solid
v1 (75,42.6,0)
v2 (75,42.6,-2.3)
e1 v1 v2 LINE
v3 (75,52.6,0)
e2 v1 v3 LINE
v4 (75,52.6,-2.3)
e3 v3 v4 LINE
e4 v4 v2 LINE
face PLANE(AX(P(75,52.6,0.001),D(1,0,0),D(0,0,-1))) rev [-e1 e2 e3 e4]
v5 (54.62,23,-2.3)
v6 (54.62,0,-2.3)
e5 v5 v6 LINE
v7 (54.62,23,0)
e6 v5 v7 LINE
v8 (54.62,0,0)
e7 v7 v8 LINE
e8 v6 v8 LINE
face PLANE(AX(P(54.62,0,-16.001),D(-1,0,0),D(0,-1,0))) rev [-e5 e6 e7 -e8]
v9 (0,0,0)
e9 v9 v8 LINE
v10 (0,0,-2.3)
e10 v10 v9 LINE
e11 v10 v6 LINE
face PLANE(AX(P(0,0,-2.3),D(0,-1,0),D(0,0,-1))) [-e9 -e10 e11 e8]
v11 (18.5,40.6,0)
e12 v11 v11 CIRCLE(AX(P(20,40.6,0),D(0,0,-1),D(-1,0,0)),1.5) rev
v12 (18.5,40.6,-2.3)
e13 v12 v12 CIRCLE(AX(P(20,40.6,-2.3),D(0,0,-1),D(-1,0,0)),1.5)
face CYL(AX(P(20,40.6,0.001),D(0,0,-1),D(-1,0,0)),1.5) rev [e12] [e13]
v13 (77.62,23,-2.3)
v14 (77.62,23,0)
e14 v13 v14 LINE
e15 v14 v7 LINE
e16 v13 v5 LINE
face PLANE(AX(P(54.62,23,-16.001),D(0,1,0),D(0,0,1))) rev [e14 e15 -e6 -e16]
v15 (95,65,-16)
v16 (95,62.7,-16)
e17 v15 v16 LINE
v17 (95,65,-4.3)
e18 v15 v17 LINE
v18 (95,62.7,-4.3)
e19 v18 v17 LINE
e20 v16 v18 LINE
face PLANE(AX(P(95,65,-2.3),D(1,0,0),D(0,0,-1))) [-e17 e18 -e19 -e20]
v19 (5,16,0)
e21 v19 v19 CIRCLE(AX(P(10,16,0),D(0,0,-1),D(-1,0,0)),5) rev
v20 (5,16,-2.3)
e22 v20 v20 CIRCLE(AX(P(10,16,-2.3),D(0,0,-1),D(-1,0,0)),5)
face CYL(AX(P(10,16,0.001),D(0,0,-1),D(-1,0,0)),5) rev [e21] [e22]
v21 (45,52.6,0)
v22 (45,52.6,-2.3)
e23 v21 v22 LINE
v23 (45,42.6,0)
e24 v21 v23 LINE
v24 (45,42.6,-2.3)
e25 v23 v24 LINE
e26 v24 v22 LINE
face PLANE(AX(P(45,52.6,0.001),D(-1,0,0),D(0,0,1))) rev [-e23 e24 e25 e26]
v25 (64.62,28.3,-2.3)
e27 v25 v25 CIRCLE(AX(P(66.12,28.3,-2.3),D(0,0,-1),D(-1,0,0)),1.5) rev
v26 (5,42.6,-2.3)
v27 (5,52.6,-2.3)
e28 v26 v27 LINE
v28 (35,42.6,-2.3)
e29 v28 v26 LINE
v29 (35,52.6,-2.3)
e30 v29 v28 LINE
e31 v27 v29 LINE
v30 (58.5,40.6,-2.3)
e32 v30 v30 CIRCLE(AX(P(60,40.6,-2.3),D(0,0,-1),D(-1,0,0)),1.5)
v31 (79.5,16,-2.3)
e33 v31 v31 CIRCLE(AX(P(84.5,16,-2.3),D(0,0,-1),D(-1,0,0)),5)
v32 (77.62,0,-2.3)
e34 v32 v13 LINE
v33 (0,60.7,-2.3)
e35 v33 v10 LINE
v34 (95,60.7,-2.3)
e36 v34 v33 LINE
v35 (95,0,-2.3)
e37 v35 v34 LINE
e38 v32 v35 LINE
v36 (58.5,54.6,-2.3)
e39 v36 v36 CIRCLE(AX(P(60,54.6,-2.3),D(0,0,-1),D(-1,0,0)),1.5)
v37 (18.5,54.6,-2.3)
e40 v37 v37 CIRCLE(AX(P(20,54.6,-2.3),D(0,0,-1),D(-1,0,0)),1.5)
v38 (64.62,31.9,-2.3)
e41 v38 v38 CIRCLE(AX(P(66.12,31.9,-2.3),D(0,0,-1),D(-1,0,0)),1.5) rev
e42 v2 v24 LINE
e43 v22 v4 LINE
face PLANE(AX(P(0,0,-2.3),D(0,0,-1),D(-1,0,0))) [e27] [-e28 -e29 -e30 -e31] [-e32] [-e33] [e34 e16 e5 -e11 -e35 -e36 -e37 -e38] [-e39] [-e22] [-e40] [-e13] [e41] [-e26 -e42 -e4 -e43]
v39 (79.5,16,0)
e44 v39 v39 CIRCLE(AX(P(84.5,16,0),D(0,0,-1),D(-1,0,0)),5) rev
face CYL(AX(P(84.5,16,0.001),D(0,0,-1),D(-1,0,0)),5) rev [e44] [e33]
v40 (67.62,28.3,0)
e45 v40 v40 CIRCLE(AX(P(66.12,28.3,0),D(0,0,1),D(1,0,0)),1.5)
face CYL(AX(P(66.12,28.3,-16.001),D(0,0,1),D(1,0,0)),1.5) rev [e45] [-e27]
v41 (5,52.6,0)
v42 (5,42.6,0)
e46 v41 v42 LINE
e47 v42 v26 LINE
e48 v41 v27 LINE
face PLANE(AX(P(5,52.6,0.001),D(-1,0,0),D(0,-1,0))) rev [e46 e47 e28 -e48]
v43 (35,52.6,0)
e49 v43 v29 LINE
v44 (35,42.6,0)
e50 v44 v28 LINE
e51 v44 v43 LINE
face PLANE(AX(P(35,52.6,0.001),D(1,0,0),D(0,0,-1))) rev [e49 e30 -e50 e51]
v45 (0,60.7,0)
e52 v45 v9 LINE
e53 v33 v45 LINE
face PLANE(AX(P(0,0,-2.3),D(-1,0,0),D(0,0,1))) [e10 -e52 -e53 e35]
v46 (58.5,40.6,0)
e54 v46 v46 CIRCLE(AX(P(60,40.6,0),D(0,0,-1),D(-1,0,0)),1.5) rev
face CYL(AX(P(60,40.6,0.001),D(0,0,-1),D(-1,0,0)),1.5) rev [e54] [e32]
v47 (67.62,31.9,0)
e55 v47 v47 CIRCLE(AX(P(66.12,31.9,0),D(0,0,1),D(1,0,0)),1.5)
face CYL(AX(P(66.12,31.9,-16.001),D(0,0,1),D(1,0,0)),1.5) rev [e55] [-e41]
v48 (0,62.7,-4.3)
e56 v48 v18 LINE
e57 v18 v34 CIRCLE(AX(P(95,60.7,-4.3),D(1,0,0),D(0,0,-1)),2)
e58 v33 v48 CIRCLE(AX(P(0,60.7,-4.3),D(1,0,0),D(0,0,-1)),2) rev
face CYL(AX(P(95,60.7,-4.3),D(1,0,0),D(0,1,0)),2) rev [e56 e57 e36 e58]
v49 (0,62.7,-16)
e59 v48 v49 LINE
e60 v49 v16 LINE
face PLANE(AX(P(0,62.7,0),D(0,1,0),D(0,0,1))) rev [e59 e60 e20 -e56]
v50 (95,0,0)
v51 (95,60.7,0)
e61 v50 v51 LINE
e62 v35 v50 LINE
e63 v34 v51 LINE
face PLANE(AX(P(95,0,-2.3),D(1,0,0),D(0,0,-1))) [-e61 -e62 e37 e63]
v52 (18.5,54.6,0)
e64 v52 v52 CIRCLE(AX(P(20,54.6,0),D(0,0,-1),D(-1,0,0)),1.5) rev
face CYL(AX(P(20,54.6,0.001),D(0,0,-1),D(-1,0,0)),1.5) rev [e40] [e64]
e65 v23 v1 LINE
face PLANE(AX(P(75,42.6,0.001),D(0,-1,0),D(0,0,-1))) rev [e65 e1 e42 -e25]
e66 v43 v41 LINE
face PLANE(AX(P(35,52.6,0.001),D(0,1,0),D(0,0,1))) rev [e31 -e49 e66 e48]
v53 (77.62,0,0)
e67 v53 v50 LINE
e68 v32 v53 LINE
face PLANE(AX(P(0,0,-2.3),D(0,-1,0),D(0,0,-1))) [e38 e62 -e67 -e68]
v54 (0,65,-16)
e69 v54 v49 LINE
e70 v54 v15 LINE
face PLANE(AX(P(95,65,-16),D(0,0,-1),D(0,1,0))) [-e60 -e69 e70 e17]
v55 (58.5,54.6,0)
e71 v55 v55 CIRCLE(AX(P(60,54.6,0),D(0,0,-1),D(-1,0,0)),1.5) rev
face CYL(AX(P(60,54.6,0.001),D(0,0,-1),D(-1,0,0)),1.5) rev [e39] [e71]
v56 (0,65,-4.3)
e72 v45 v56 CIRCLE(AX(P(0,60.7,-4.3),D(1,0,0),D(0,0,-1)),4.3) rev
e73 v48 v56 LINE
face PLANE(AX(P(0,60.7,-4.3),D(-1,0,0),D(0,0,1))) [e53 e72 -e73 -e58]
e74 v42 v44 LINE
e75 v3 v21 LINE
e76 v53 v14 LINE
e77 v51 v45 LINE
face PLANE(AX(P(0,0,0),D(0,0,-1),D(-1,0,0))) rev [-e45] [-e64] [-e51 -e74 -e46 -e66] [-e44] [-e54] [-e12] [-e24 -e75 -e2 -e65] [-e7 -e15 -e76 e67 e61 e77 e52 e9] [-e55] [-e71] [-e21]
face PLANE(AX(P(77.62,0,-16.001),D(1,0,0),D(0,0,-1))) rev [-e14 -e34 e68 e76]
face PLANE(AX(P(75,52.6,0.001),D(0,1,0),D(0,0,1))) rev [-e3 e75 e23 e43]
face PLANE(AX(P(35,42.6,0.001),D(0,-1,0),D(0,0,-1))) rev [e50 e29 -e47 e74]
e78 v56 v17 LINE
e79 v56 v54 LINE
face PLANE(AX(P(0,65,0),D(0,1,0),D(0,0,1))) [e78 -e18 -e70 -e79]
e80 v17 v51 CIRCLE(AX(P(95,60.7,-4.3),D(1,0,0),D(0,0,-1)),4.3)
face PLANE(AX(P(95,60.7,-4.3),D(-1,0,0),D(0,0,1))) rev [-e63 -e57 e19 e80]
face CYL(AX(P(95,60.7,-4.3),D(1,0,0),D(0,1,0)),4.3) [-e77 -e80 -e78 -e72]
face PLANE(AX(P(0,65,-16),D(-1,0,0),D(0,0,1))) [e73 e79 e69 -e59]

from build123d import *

# Parameters (mm, degrees)
SKETCH1_W                    = 95
SKETCH1_H                    = 65
BASE_FLANGE1_DEPTH           = 2.3
EDGE_FLANGE1_STRIP_W         = 13.2
EDGE_FLANGE1_STRIP_H         = 2.3
EDGE_FLANGE1_STRIP_CUT_DEPTH = 95
EDGE_FLANGE1_DEPTH           = 95
CUT_EXTRUDE1_REACH           = 118.215
SKETCH9_R                    = 1.5
SKETCH9_W                    = 23
SKETCH9_H                    = 23
CUT_EXTRUDE3_REACH           = 117.921
SKETCH10_R                   = 1.5
SKETCH10_W                   = 30
SKETCH10_H                   = 10
CUT_EXTRUDE4_REACH           = 117.921
SKETCH11_R                   = 5


# Sheet-metal steps are written as plain solids
with BuildPart() as part:
    # Sketch1 → Base-Flange1 (new body)
    with BuildSketch(Plane.XY):
        with Locations((47.5, 32.5)):
            Rectangle(SKETCH1_W, SKETCH1_H)
    extrude(amount=-BASE_FLANGE1_DEPTH)

    # Edge-Flange1 strip (across the edge) → Edge-Flange1 strip cut (cut)
    with BuildSketch(Plane(origin=(0, 65, -2.3), x_dir=(0, -1, 0), z_dir=(1, 0, 0))):
        with Locations((-2.3, -1.15)):
            Rectangle(EDGE_FLANGE1_STRIP_W, EDGE_FLANGE1_STRIP_H)
    extrude(amount=EDGE_FLANGE1_STRIP_CUT_DEPTH, mode=Mode.SUBTRACT)

    # Edge-Flange1 section (across the edge) → Edge-Flange1 (add)
    with BuildSketch(Plane(origin=(0, 65, -2.3), x_dir=(0, -1, 0), z_dir=(1, 0, 0))):
        with BuildLine():
            Line((0, 2), (0, 13.7))
            Line((0, 13.7), (2.3, 13.7))
            Line((2.3, 13.7), (2.3, 2))
            ThreePointArc((2.3, 2), (2.885786438, 0.585786438), (4.3, 0))
            Line((4.3, 0), (4.3, -2.3))
            ThreePointArc((4.3, -2.3), (1.259440841, -1.040559159), (0, 2))
        make_face()
    extrude(amount=EDGE_FLANGE1_DEPTH)

    # Sketch9 → Cut-Extrude1 (cut, up to next)
    with BuildSketch(Plane.XY, mode=Mode.PRIVATE) as cut_extrude1_sk1:
        with Locations((66.12, 28.3)):
            Circle(SKETCH9_R)
    cut_extrude1_tool1 = extrude(cut_extrude1_sk1.sketch, amount=-CUT_EXTRUDE1_REACH, mode=Mode.PRIVATE) & part.part
    # Sketch9 → Cut-Extrude1 (cut, up to next)
    with BuildSketch(Plane.XY, mode=Mode.PRIVATE) as cut_extrude1_sk2:
        with Locations((66.12, 31.9)):
            Circle(SKETCH9_R)
    cut_extrude1_tool2 = extrude(cut_extrude1_sk2.sketch, amount=-CUT_EXTRUDE1_REACH, mode=Mode.PRIVATE) & part.part
    # Sketch9 → Cut-Extrude1 (cut, up to next)
    with BuildSketch(Plane.XY, mode=Mode.PRIVATE) as cut_extrude1_sk3:
        with Locations((66.12, 11.5)):
            Rectangle(SKETCH9_W, SKETCH9_H)
    cut_extrude1_tool3 = extrude(cut_extrude1_sk3.sketch, amount=-CUT_EXTRUDE1_REACH, mode=Mode.PRIVATE) & part.part
    add(cut_extrude1_tool1.solids().sort_by_distance((66.12, 28.3, 0))[0], mode=Mode.SUBTRACT)
    add(cut_extrude1_tool2.solids().sort_by_distance((66.12, 31.9, 0))[0], mode=Mode.SUBTRACT)
    add(cut_extrude1_tool3.solids().sort_by_distance((66.12, 11.5, 0))[0], mode=Mode.SUBTRACT)

    # Sketch10 → Cut-Extrude3 (cut, up to next)
    with BuildSketch(Plane(origin=(0, 0, -2.3), x_dir=(-1, 0, 0), z_dir=(0, 0, -1)), mode=Mode.PRIVATE) as cut_extrude3_sk1:
        with Locations((-60, 54.6)):
            Circle(SKETCH10_R)
    cut_extrude3_tool1 = extrude(cut_extrude3_sk1.sketch, amount=-CUT_EXTRUDE3_REACH, mode=Mode.PRIVATE) & part.part
    # Sketch10 → Cut-Extrude3 (cut, up to next)
    with BuildSketch(Plane(origin=(0, 0, -2.3), x_dir=(-1, 0, 0), z_dir=(0, 0, -1)), mode=Mode.PRIVATE) as cut_extrude3_sk2:
        with Locations((-60, 40.6)):
            Circle(SKETCH10_R)
    cut_extrude3_tool2 = extrude(cut_extrude3_sk2.sketch, amount=-CUT_EXTRUDE3_REACH, mode=Mode.PRIVATE) & part.part
    # Sketch10 → Cut-Extrude3 (cut, up to next)
    with BuildSketch(Plane(origin=(0, 0, -2.3), x_dir=(-1, 0, 0), z_dir=(0, 0, -1)), mode=Mode.PRIVATE) as cut_extrude3_sk3:
        with Locations((-20, 54.6)):
            Circle(SKETCH10_R)
    cut_extrude3_tool3 = extrude(cut_extrude3_sk3.sketch, amount=-CUT_EXTRUDE3_REACH, mode=Mode.PRIVATE) & part.part
    # Sketch10 → Cut-Extrude3 (cut, up to next)
    with BuildSketch(Plane(origin=(0, 0, -2.3), x_dir=(-1, 0, 0), z_dir=(0, 0, -1)), mode=Mode.PRIVATE) as cut_extrude3_sk4:
        with Locations((-20, 40.6)):
            Circle(SKETCH10_R)
    cut_extrude3_tool4 = extrude(cut_extrude3_sk4.sketch, amount=-CUT_EXTRUDE3_REACH, mode=Mode.PRIVATE) & part.part
    # Sketch10 → Cut-Extrude3 (cut, up to next)
    with BuildSketch(Plane(origin=(0, 0, -2.3), x_dir=(-1, 0, 0), z_dir=(0, 0, -1)), mode=Mode.PRIVATE) as cut_extrude3_sk5:
        with Locations((-20, 47.6)):
            Rectangle(SKETCH10_W, SKETCH10_H)
    cut_extrude3_tool5 = extrude(cut_extrude3_sk5.sketch, amount=-CUT_EXTRUDE3_REACH, mode=Mode.PRIVATE) & part.part
    # Sketch10 → Cut-Extrude3 (cut, up to next)
    with BuildSketch(Plane(origin=(0, 0, -2.3), x_dir=(-1, 0, 0), z_dir=(0, 0, -1)), mode=Mode.PRIVATE) as cut_extrude3_sk6:
        with Locations((-60, 47.6)):
            Rectangle(SKETCH10_W, SKETCH10_H)
    cut_extrude3_tool6 = extrude(cut_extrude3_sk6.sketch, amount=-CUT_EXTRUDE3_REACH, mode=Mode.PRIVATE) & part.part
    add(cut_extrude3_tool1.solids().sort_by_distance((60, 54.6, -2.3))[0], mode=Mode.SUBTRACT)
    add(cut_extrude3_tool2.solids().sort_by_distance((60, 40.6, -2.3))[0], mode=Mode.SUBTRACT)
    add(cut_extrude3_tool3.solids().sort_by_distance((20, 54.6, -2.3))[0], mode=Mode.SUBTRACT)
    add(cut_extrude3_tool4.solids().sort_by_distance((20, 40.6, -2.3))[0], mode=Mode.SUBTRACT)
    add(cut_extrude3_tool5.solids().sort_by_distance((20, 47.6, -2.3))[0], mode=Mode.SUBTRACT)
    add(cut_extrude3_tool6.solids().sort_by_distance((60, 47.6, -2.3))[0], mode=Mode.SUBTRACT)

    # Sketch11 → Cut-Extrude4 (cut, up to next)
    with BuildSketch(Plane(origin=(0, 0, -2.3), x_dir=(-1, 0, 0), z_dir=(0, 0, -1)), mode=Mode.PRIVATE) as cut_extrude4_sk1:
        with Locations((-10, 16)):
            Circle(SKETCH11_R)
    cut_extrude4_tool1 = extrude(cut_extrude4_sk1.sketch, amount=-CUT_EXTRUDE4_REACH, mode=Mode.PRIVATE) & part.part
    # Sketch11 → Cut-Extrude4 (cut, up to next)
    with BuildSketch(Plane(origin=(0, 0, -2.3), x_dir=(-1, 0, 0), z_dir=(0, 0, -1)), mode=Mode.PRIVATE) as cut_extrude4_sk2:
        with Locations((-84.5, 16)):
            Circle(SKETCH11_R)
    cut_extrude4_tool2 = extrude(cut_extrude4_sk2.sketch, amount=-CUT_EXTRUDE4_REACH, mode=Mode.PRIVATE) & part.part
    add(cut_extrude4_tool1.solids().sort_by_distance((10, 16, -2.3))[0], mode=Mode.SUBTRACT)
    add(cut_extrude4_tool2.solids().sort_by_distance((84.5, 16, -2.3))[0], mode=Mode.SUBTRACT)


solid = part.part
